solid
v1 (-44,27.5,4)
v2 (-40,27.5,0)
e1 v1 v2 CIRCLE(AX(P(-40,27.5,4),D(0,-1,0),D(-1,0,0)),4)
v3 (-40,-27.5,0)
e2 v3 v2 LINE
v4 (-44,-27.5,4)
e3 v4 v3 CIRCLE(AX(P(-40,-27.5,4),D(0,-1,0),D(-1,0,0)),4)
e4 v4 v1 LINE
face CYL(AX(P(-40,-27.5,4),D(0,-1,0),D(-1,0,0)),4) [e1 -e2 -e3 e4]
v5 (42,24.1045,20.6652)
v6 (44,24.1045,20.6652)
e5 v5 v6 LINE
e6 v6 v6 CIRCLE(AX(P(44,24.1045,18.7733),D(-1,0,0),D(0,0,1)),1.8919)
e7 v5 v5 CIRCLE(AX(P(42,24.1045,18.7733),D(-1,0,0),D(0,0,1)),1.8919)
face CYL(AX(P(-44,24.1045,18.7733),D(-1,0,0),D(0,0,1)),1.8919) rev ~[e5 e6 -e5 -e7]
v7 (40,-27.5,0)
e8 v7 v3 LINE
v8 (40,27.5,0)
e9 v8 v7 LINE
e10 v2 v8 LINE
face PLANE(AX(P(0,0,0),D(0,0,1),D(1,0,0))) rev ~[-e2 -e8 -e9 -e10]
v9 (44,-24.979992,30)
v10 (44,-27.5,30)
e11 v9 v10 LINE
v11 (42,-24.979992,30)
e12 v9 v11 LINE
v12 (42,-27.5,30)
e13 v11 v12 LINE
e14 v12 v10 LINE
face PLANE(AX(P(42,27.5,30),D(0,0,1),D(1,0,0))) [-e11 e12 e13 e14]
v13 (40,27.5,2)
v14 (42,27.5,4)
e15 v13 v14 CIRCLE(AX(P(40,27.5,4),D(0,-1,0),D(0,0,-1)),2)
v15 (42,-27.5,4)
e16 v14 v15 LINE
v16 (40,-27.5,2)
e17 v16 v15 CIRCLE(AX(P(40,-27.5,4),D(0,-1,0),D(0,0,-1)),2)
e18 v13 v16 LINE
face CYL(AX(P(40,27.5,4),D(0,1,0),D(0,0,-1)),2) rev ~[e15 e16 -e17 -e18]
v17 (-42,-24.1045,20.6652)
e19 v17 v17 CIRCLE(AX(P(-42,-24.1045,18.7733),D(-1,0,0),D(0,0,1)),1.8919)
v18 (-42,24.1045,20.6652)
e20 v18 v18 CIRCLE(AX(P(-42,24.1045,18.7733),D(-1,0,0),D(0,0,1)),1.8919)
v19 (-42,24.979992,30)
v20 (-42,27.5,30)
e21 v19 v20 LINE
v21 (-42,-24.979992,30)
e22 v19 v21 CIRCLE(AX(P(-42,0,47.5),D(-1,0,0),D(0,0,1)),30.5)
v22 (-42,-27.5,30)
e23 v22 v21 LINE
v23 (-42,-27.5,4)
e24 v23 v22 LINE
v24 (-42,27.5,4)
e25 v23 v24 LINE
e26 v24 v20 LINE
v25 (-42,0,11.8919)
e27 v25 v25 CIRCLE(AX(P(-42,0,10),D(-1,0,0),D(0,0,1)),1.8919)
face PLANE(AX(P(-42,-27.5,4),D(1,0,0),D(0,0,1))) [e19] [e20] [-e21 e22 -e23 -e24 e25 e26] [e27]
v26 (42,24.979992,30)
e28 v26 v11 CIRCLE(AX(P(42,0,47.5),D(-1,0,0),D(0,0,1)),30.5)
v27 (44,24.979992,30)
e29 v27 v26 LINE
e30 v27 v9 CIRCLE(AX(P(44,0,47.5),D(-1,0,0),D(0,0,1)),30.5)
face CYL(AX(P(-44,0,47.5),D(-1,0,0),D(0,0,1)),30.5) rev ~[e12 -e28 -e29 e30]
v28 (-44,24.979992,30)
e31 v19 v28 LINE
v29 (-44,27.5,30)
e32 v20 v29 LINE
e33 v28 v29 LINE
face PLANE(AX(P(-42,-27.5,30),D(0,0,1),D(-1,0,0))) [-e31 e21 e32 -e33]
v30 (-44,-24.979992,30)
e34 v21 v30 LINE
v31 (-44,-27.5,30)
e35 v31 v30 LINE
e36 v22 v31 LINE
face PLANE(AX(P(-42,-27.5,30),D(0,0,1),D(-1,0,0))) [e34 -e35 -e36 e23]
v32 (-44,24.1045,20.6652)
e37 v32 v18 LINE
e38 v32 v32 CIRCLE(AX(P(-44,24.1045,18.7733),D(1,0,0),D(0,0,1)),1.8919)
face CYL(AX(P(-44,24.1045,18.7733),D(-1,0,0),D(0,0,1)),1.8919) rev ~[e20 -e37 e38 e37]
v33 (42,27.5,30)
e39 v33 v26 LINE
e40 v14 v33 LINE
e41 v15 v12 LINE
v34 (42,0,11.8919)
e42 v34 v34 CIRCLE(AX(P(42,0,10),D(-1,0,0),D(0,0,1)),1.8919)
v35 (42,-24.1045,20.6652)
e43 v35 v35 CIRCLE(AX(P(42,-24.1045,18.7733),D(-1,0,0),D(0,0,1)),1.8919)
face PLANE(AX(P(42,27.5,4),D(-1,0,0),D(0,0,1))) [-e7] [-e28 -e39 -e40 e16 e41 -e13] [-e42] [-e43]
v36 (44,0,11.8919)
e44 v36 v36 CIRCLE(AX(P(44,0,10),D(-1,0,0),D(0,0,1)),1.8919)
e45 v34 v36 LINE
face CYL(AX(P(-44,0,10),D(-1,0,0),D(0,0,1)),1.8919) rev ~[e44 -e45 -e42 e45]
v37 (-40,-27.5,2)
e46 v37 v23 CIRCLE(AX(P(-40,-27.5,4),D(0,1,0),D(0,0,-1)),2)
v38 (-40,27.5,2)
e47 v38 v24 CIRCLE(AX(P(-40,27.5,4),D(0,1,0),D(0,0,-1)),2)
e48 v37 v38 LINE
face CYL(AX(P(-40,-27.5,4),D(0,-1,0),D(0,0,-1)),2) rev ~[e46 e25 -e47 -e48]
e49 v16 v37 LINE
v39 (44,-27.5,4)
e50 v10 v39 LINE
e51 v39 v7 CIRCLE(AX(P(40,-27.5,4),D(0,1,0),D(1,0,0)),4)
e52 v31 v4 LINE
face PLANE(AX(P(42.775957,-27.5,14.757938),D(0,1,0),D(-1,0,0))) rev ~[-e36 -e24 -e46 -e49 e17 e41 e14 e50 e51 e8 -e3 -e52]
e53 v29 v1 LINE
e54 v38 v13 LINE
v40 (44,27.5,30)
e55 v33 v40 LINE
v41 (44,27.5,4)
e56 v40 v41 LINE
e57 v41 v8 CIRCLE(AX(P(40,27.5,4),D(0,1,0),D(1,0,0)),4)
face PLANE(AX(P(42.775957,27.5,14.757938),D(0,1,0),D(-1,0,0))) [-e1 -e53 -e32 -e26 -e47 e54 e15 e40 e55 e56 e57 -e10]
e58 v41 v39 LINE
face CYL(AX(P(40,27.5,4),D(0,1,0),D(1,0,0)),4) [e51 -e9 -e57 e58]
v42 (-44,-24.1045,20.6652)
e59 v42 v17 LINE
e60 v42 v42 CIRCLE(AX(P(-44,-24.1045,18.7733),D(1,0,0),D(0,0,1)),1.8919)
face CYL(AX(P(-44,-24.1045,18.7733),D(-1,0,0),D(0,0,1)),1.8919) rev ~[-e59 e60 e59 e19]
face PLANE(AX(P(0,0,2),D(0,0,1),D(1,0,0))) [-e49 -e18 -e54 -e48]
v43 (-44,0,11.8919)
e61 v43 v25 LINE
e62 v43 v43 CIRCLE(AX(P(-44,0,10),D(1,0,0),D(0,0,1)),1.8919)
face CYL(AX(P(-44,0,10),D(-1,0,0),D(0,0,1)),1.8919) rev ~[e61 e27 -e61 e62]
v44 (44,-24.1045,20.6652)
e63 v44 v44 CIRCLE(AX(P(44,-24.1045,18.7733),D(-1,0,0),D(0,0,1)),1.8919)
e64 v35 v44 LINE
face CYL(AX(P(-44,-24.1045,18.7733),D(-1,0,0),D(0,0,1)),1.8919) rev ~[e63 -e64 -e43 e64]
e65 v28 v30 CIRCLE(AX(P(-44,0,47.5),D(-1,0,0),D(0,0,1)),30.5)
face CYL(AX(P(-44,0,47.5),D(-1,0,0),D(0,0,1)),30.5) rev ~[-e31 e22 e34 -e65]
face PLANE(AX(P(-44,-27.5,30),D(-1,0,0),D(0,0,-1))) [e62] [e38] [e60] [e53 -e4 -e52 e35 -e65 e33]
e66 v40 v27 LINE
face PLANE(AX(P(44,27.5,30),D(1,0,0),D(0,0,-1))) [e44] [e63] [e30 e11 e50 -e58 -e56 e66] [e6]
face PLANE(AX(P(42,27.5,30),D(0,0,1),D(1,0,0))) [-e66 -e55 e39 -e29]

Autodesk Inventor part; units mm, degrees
ref_plane "YZ Plane" through (0, 0, 0) normal (1, 0, 0) x (0, 1, 0)
ref_plane "XZ Plane" through (0, 0, 0) normal (0, 1, 0) x (-1, 0, 0)
ref_plane "XY Plane" through (0, 0, 0) normal (0, 0, 1) x (1, 0, 0)
sketch "スケッチ2" plane through (0, 0, 0) normal (0, 0, 1) x (1, 0, 0)
  line L0 (44, -27.5) -> (-44, -27.5)
  line L1 (-44, -27.5) -> (-44, 27.5)
  line L2 (-44, 27.5) -> (44, 27.5)
  line L3 (44, 27.5) -> (44, -27.5)
  line L4 (44, -27.5) -> (-44, 27.5) construction
  line L5 (-44, -27.5) -> (44, 27.5) construction
  point P0 (0, 0)
  dimension "d5" = 88
  dimension "d6" = 55
extrude "プレート2" add sketch "スケッチ2" along normal blind 2
sketch "スケッチ3" plane through (42, 27.5, 0) normal (1, 0, 0) x (0, 1, 0)
  line L0 (-55, 0) -> (0, 0)
  line L1 (0, 0) -> (0, 30)
  line L2 (0, 30) -> (-55, 30)
  line L3 (-55, 30) -> (-55, 0)
edge flange "フランジ1" height 30 angle 90 thickness 2 bend radius 2 thickness toward (1, 0, 0) relief tear relief width 2 relief depth 1 corner gap 2 corner form 0 edges at (44, 0, 2) (-44, 0, 2) wall of the first edge with corners at (42, -27.5, 0) (42, 27.5, 0) (42, 27.5, 30) (42, -27.5, 30)
bend "曲げ1"
corner "コーナー1"
sketch "スケッチ5" plane through (-44, -27.5, 30) normal (-1, 0, 0) x (0, 0, 1)
  circle A0 centre (17.5, 27.5) radius 37.5
  circle A1 centre (-11.2267, 3.3955) radius 1.8919
  circle A2 centre (10.9882, -9.4303) radius 1.8919
  circle A3 centre (36.25, -4.976) radius 1.8919
  circle A4 centre (52.7385, 14.6742) radius 1.8919
  circle A5 centre (52.7385, 40.3258) radius 1.8919
  circle A6 centre (36.25, 59.976) radius 1.8919
  circle A7 centre (10.9882, 64.4303) radius 1.8919
  circle A8 centre (-11.2267, 51.6045) radius 1.8919
  circle A9 centre (-20, 27.5) radius 1.8919
  line L0 (-26, 55) -> (-26, 0) projected
  circle A10 centre (17.5, 27.5) radius 30.5
  point P0 (-30, 27.5)
  dimension "d26" = 75
  dimension "d29" = 360
  dimension "d31" = 0
  dimension "d32" = 0
  dimension "d36" = 6
  dimension "d37" = 61
extrude "押し出し1" cut sketch "スケッチ5" against normal up to surface (88 mm away) contours A8 A0 | A0 A8 | A1 A0 | A0 A1 | A9 A0 | A0 A9 | A10
equation "\"d7\" = Thickness"
equation "\"d8\" = BendReliefWidth"
equation "\"d9\" = BendReliefDepth"
equation "\"d10\" = MinimumRemnant"
equation "\"d11\" = TransitionRadius"
equation "\"d14\" = BendRadius"
equation "\"d15\" = CornerReliefSize"
equation "\"d16\" = GapSize"
equation "\"d17\" = JacobiRadiusSize"
equation "\"BendRadius\" = Thickness"
equation "\"BendReliefWidth\" = Thickness"
equation "\"BendReliefDepth\" = 0.5 * Thickness"
equation "\"CornerReliefSize\" = 4 * Thickness"
equation "\"MinimumRemnant\" = 2 * Thickness"
equation "\"TransitionRadius\" = BendRadius"
equation "\"JacobiRadiusSize\" = BendRadius"
equation "\"GapSize\" = Thickness"
equation "\"Thickness\" = 2"
properties part number "servo_arm" material "アルミニウム 5052"
